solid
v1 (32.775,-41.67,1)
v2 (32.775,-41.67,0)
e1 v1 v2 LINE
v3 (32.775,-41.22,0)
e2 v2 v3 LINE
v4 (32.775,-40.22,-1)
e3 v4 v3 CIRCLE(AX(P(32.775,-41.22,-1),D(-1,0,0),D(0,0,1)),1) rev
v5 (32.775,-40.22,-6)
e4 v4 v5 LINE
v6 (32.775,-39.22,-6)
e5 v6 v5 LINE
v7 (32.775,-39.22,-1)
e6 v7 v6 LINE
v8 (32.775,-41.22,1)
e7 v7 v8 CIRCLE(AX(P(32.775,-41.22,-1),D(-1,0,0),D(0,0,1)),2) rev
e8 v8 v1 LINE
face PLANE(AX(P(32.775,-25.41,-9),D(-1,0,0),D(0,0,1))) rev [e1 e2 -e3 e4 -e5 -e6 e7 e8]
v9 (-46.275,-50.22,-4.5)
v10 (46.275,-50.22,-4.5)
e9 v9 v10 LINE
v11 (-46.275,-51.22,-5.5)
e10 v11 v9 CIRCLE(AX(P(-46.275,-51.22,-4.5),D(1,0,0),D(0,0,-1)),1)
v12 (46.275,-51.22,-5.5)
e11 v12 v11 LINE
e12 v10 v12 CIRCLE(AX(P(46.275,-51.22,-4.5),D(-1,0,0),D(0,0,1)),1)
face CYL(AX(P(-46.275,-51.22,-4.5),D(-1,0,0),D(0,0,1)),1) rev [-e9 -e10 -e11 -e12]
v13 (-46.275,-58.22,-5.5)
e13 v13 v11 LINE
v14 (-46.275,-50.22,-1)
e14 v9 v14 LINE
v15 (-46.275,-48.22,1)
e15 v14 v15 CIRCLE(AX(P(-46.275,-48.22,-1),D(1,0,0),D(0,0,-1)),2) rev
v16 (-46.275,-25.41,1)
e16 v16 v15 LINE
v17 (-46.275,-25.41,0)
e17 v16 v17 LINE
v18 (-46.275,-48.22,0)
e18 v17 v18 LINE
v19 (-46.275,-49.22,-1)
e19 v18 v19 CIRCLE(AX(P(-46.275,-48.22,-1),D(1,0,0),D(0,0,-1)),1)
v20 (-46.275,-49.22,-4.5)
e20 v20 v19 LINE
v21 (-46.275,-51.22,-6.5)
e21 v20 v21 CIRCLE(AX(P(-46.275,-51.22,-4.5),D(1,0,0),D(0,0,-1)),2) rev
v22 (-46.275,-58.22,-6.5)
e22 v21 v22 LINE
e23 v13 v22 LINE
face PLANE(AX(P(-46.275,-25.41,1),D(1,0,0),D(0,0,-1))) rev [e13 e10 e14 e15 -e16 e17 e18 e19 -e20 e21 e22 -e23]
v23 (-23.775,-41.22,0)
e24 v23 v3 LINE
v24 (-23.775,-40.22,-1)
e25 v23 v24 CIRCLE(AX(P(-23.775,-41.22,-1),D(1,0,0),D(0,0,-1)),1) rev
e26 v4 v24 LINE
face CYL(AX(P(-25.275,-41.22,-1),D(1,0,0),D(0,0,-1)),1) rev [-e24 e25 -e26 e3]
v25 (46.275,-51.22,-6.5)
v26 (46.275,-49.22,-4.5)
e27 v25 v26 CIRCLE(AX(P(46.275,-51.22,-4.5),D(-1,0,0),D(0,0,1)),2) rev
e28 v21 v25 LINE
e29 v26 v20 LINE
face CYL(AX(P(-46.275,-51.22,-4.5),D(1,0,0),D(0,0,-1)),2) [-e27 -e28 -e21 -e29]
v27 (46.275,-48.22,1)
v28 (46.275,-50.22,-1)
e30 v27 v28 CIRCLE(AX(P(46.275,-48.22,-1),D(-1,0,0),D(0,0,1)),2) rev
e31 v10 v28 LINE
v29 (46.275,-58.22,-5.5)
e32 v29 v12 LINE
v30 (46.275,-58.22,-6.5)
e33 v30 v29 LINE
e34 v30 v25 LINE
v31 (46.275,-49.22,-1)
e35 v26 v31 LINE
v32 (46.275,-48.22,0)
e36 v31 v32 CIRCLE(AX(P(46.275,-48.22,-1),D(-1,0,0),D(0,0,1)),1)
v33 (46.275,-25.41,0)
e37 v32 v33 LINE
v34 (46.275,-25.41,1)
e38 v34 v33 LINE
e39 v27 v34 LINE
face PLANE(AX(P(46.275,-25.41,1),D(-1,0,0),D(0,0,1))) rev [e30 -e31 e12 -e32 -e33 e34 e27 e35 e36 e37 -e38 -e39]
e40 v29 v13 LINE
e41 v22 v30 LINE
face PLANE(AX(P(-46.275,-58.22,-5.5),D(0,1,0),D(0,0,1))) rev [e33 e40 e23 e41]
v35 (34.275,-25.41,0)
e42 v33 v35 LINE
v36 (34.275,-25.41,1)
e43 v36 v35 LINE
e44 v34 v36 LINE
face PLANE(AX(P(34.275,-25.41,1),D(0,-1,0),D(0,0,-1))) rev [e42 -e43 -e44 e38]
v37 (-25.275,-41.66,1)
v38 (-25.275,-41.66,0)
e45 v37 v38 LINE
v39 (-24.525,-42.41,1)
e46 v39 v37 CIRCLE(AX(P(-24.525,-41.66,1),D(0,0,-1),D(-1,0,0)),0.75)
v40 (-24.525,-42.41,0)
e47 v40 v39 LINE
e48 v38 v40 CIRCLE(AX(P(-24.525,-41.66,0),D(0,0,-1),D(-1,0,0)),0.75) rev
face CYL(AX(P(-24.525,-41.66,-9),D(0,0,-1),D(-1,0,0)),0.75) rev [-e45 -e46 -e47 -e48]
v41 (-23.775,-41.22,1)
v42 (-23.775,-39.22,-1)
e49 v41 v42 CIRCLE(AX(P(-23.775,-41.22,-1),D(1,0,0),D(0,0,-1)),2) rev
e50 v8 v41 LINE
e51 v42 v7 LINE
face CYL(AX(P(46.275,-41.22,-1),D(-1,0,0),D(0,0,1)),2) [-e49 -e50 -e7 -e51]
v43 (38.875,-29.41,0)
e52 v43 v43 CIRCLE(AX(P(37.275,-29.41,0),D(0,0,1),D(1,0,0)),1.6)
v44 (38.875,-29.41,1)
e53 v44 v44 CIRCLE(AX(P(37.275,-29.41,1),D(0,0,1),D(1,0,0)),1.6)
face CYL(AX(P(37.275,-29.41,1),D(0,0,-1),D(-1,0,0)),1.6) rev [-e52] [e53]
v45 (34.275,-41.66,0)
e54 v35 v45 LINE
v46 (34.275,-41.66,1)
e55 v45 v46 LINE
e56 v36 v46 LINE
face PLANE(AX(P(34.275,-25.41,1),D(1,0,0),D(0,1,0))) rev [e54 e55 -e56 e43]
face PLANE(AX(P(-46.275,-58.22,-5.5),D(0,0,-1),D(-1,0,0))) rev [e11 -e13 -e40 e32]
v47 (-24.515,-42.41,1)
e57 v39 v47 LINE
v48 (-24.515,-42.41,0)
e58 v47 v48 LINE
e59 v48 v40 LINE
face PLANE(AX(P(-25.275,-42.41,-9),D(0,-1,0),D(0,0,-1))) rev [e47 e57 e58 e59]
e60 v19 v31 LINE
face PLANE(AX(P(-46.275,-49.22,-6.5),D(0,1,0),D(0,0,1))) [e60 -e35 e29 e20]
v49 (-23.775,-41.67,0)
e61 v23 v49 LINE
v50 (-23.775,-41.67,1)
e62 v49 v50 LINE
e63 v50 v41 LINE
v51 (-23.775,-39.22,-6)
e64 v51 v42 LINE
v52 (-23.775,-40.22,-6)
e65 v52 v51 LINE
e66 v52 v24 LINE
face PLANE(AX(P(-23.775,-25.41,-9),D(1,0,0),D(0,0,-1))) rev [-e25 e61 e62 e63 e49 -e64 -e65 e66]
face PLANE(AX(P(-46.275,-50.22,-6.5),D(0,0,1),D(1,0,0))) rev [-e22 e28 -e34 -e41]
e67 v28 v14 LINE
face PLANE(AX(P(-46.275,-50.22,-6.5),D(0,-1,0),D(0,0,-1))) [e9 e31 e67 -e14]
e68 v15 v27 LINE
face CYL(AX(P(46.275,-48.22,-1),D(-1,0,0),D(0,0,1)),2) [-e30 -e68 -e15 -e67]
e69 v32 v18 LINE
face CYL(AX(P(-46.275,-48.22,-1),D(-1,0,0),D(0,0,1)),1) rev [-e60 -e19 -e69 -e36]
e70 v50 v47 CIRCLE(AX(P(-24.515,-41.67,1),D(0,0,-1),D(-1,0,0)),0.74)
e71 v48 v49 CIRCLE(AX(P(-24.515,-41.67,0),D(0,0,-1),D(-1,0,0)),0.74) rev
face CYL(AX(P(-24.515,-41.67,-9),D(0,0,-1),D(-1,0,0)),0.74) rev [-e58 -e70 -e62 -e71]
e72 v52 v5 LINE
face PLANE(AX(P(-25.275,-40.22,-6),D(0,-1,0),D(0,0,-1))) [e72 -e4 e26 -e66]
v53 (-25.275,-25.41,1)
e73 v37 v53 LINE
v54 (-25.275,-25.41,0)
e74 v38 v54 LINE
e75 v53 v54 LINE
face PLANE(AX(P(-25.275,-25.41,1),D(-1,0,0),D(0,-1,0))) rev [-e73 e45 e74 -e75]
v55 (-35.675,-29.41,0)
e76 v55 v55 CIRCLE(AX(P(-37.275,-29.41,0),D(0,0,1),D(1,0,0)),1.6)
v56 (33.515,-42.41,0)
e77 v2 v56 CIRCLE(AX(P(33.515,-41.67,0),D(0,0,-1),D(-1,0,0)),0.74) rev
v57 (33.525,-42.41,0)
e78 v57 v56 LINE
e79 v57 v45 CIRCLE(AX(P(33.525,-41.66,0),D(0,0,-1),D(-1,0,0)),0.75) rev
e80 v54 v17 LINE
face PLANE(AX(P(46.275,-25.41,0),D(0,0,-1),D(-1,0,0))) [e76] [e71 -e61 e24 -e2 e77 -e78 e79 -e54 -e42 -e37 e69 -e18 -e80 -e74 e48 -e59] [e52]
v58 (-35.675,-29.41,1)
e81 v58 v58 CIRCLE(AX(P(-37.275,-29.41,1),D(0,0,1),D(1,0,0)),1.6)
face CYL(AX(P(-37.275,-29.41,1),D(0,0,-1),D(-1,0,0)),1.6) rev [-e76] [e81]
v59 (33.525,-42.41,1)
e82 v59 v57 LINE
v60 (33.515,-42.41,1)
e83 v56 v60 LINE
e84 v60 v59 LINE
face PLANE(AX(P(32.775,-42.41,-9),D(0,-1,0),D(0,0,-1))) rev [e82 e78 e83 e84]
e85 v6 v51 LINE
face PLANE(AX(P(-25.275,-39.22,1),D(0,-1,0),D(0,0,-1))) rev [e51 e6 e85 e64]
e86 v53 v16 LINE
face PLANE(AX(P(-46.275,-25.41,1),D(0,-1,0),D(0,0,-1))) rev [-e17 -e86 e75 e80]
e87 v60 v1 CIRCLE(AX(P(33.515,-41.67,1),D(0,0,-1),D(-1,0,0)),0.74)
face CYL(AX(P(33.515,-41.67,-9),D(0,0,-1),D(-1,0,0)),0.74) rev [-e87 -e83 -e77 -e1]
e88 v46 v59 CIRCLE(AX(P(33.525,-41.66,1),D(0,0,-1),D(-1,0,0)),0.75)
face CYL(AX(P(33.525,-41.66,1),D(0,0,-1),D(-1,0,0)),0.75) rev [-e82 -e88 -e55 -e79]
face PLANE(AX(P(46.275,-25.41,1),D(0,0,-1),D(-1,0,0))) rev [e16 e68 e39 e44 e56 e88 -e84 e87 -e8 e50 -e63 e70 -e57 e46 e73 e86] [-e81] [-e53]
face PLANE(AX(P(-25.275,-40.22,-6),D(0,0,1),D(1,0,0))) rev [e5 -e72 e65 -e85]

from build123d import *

# Parameters (mm, degrees)
ESQUISSE1_R             = 1.6
EXTRUSION1_DEPTH        = 1
ESQUISSE2_W             = 59.55
ESQUISSE2_H             = 1
EXTRUSION2_DEPTH        = 7
ESQUISSE3_W             = 92.55
ESQUISSE3_H             = 1
EXTRUSION3_DEPTH        = 7.5
ESQUISSE4_W             = 92.55
ESQUISSE4_H             = 1
EXTRUSION4_DEPTH        = 8
CONG_1_R                = 1
CONG_2_R                = 2
CONG_3_R                = 1
CONG_4_R                = 2
ESQUISSE5_W             = 1.5
ESQUISSE5_H             = 17
ENL_V_MAT_EXTRU_1_DEPTH = 10
CONG_5_R                = 0.75
CONG_6_R                = 0.74
CONG_7_R                = 0.74
CONG_8_R                = 0.75


with BuildPart() as part:
    # Esquisse1 → Extrusion1 (new body)
    with BuildSketch(Plane.XY):
        Polygon((-46.275, -25.41), (-25.275, -25.41), (-25.275, -39.22), (34.275, -39.22), (34.275, -25.41), (46.275, -25.41), (46.275, -49.22), (-46.275, -49.22), align=None)
        with Locations((37.275, -29.41)):
            Circle(ESQUISSE1_R, mode=Mode.SUBTRACT)
        with Locations((-37.275, -29.41)):
            Circle(ESQUISSE1_R, mode=Mode.SUBTRACT)
    extrude(amount=EXTRUSION1_DEPTH)

    # Esquisse2 → Extrusion2 (add)
    with BuildSketch(Plane.XY.offset(1)):
        with Locations((4.5, -39.72)):
            Rectangle(ESQUISSE2_W, ESQUISSE2_H)
    extrude(amount=-EXTRUSION2_DEPTH)

    # Esquisse3 → Extrusion3 (add)
    with BuildSketch(Plane.XY.offset(1)):
        with Locations((0, -49.72)):
            Rectangle(ESQUISSE3_W, ESQUISSE3_H)
    extrude(amount=-EXTRUSION3_DEPTH)

    # Esquisse4 → Extrusion4 (add)
    with BuildSketch(Plane.XZ.offset(50.22)):
        with Locations((0, -6)):
            Rectangle(ESQUISSE4_W, ESQUISSE4_H)
    extrude(amount=EXTRUSION4_DEPTH)

    # Congé1
    cong_1_edges = [part.edges().sort_by_distance(p)[0] for p in [
        (0, -50.22, -5.5),
        (0, -49.22, 0),
    ]]
    fillet(cong_1_edges, radius=CONG_1_R)

    # Congé2
    cong_2_edges = [part.edges().sort_by_distance(p)[0] for p in [
        (0, -49.22, -6.5),
        (0, -50.22, 1),
    ]]
    fillet(cong_2_edges, radius=CONG_2_R)

    # Congé3
    cong_3_edges = [part.edges().sort_by_distance(p)[0] for p in [
        (4.5, -40.22, 0),
    ]]
    fillet(cong_3_edges, radius=CONG_3_R)

    # Congé4
    # the kernel refuses this fillet: 2 mm, written as the material it takes off along each edge
    with BuildSketch(Plane(origin=(-25.275, -39.22, 1), x_dir=(0, -1, 0), z_dir=(1, 0, 0))) as cong_4_piece_1:
        with BuildLine():
            CenterArc((CONG_4_R, CONG_4_R), CONG_4_R, 180, 90)
            Line((0, CONG_4_R), (0, 0))
            Line((0, 0), (CONG_4_R, 0))
        make_face()
    extrude(amount=59.55, mode=Mode.SUBTRACT)

    # Esquisse5 → Enlèv. mat.-Extru.1 (cut)
    with BuildSketch(Plane.XY.offset(1)):
        with Locations((-24.525, -33.91)):
            Rectangle(ESQUISSE5_W, ESQUISSE5_H)
        with Locations((33.525, -33.91)):
            Rectangle(ESQUISSE5_W, ESQUISSE5_H)
    extrude(amount=-ENL_V_MAT_EXTRU_1_DEPTH, mode=Mode.SUBTRACT)

    # Congé5
    cong_5_edges = [part.edges().sort_by_distance(p)[0] for p in [
        (-25.275, -42.41, 0.5),
    ]]
    fillet(cong_5_edges, radius=CONG_5_R)

    # Congé6
    cong_6_edges = [part.edges().sort_by_distance(p)[0] for p in [
        (-23.775, -42.41, 0.5),
    ]]
    fillet(cong_6_edges, radius=CONG_6_R)

    # Congé7
    cong_7_edges = [part.edges().sort_by_distance(p)[0] for p in [
        (32.775, -42.41, 0.5),
    ]]
    fillet(cong_7_edges, radius=CONG_7_R)

    # Congé8
    cong_8_edges = [part.edges().sort_by_distance(p)[0] for p in [
        (34.275, -42.41, 0.5),
    ]]
    fillet(cong_8_edges, radius=CONG_8_R)


solid = part.part
